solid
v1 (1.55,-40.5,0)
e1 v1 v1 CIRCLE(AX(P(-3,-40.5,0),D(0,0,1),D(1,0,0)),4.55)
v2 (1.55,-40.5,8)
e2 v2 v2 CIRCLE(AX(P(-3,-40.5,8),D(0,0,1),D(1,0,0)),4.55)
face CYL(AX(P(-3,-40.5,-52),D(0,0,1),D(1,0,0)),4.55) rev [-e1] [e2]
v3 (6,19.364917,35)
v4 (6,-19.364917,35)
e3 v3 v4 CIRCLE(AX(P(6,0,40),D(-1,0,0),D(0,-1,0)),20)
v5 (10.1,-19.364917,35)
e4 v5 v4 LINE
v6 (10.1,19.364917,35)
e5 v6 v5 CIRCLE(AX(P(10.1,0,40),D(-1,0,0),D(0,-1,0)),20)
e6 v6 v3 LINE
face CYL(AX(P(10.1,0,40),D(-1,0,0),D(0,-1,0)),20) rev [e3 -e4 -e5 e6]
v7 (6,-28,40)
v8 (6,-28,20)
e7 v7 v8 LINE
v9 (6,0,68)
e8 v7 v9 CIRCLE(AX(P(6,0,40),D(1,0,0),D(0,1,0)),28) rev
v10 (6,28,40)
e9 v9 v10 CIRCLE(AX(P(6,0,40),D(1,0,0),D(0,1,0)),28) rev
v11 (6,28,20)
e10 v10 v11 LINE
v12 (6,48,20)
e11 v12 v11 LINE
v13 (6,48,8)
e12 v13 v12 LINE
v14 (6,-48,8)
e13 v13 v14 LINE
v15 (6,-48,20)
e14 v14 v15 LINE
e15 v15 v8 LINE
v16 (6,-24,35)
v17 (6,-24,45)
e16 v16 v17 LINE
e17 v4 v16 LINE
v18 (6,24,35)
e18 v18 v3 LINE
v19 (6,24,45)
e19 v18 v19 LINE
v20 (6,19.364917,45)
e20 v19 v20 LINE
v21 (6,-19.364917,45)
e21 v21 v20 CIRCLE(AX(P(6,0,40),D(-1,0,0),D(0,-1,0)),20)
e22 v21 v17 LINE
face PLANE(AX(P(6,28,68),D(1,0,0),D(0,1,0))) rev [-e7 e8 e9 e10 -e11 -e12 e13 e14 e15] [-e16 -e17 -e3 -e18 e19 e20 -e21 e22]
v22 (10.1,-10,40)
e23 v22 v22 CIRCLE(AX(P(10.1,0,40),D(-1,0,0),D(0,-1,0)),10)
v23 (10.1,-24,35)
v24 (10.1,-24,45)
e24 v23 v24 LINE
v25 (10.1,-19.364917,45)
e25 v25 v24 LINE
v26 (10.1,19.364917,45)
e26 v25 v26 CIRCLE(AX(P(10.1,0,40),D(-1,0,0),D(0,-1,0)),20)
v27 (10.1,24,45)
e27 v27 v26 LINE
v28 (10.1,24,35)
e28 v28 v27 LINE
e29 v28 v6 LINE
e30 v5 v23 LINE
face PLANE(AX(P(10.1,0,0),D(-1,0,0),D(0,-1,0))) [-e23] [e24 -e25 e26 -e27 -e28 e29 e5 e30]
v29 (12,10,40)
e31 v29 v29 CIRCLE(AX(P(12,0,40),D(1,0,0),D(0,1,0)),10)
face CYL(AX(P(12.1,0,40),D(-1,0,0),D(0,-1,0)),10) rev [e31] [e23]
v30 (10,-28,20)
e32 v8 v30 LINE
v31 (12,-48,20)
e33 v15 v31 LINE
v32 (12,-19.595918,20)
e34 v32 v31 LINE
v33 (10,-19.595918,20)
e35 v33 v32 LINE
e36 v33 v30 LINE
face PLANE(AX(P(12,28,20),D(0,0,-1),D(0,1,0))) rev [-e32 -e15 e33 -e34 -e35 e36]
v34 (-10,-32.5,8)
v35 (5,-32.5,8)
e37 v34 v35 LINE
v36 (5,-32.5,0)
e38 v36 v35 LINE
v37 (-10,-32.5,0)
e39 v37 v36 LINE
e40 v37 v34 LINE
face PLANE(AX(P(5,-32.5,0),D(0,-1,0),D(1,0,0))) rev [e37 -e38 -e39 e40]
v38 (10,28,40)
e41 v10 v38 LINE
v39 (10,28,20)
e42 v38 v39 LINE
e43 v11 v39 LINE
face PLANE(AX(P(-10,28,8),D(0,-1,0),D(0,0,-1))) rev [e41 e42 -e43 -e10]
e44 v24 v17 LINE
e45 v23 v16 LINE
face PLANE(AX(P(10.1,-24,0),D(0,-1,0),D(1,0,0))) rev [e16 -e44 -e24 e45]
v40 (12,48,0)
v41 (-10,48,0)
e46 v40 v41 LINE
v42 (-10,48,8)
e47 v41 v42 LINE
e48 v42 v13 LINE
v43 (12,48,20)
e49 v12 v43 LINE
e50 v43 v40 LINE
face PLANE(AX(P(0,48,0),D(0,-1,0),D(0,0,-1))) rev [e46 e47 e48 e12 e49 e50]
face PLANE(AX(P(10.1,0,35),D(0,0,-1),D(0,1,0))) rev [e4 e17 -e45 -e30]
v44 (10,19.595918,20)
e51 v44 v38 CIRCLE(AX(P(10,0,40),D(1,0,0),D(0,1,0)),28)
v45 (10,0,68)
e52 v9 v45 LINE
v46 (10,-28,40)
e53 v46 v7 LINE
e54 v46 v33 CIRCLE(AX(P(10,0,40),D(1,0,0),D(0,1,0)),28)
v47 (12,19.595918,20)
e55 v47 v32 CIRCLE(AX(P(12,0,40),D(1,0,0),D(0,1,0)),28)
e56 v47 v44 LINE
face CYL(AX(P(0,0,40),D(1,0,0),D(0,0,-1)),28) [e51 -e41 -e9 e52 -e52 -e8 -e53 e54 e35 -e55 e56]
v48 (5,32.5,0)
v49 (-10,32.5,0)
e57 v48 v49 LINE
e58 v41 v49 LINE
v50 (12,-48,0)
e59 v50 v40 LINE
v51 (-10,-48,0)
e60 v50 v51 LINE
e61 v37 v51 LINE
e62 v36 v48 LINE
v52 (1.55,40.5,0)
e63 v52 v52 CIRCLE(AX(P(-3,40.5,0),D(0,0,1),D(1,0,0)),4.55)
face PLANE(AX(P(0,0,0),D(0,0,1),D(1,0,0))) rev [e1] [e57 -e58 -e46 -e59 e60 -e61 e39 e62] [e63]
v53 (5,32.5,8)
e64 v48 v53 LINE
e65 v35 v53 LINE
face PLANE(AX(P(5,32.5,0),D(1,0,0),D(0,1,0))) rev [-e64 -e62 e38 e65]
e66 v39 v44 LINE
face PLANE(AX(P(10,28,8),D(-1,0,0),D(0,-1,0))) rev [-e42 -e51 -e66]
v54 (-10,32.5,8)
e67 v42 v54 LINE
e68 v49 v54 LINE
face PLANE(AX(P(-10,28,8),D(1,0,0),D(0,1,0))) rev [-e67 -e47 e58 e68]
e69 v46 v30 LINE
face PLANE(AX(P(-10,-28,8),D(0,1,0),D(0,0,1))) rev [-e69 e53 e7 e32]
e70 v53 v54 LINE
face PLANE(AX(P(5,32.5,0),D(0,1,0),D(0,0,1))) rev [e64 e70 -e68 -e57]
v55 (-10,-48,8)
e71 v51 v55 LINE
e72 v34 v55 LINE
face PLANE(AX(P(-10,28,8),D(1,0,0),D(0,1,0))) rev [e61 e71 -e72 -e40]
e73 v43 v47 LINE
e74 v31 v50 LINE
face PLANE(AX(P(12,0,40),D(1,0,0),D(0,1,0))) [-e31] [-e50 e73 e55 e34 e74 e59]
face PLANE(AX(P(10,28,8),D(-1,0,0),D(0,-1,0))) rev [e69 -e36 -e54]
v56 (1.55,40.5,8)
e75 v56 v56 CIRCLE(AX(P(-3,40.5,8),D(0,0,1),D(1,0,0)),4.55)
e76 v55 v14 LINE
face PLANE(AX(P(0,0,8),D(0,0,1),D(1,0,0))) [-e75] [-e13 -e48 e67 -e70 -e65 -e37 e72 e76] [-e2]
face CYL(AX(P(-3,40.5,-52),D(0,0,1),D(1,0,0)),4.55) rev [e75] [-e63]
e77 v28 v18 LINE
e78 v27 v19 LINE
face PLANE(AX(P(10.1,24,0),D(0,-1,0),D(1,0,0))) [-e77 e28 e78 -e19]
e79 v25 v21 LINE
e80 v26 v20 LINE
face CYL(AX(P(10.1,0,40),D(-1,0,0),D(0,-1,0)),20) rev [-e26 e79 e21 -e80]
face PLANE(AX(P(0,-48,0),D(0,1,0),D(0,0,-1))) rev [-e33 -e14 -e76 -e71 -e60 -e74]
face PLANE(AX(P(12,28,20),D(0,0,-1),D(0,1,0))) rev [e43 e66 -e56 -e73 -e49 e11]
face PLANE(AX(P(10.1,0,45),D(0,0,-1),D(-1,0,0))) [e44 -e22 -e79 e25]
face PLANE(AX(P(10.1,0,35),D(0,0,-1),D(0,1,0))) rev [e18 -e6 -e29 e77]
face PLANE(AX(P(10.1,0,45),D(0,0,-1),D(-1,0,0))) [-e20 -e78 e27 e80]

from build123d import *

# Parameters (mm, degrees)
SKETCH_1_W          = 20
SKETCH_1_H          = 56
EXTRUDE_1_DEPTH     = 8
SKETCH_2_W          = 4
SKETCH_2_H          = 56
EXTRUDE_2_DEPTH     = 60
FILLET_1_R          = 28
SKETCH_5_R          = 28
EXTRUDE_3_DEPTH     = 2
CUT_EXTRUDE_2_DEPTH = 4.1
SKETCH_6_W          = 20
SKETCH_6_H          = 56
EXTRUDE_4_DEPTH     = 2
SKETCH_7_R          = 10
CUT_EXTRUDE_3_DEPTH = 2
EXTRUDE_5_DEPTH     = 20
SKETCH_3_R          = 4.55
CUT_EXTRUDE_1_DEPTH = 60
SKETCH_9_W          = 15
SKETCH_9_H          = 65
CUT_EXTRUDE_4_DEPTH = 78.768888381


with BuildPart() as part:
    # 스케치1 → 보스-돌출1 (new body)
    with BuildSketch(Plane.XY):
        Rectangle(SKETCH_1_W, SKETCH_1_H)
    extrude(amount=EXTRUDE_1_DEPTH)

    # 스케치2 → 보스-돌출2 (add)
    with BuildSketch(Plane.XY.offset(8)):
        with Locations((8, 0)):
            Rectangle(SKETCH_2_W, SKETCH_2_H)
    extrude(amount=EXTRUDE_2_DEPTH)

    # 필렛1
    fillet_1_edges = [part.edges().sort_by_distance(p)[0] for p in [
        (8, 28, 68),
        (8, -28, 68),
    ]]
    fillet(fillet_1_edges, radius=FILLET_1_R - 0.0001)  # a hair under: the kernel refuses the full size

    # 스케치5 → 보스-돌출3 (add)
    with BuildSketch(Plane(origin=(10, 0, 0), x_dir=(0, 0, -1), z_dir=(1, 0, 0))):
        with Locations(Location((-40, 0, 0), (0, 0, 90))):
            Circle(SKETCH_5_R)
    extrude(amount=EXTRUDE_3_DEPTH)

    # 스케치4 → 컷-돌출2 (cut)
    with BuildSketch(Plane.ZY.offset(-6)):
        with BuildLine():
            Line((35, 16), (35, 19.364916731))
            ThreePointArc((35, 19.364916731), (20, 0), (35, -19.364916731))
            Line((35, -19.364916731), (35, -16))
            Line((35, -16), (45, -16))
            Line((45, -16), (45, -19.364916731))
            ThreePointArc((45, -19.364916731), (55.811388301, -12.247448714), (60, 0))
            ThreePointArc((60, 0), (55.811388301, 12.247448714), (45, 19.364916731))
            Line((45, 19.364916731), (45, 16))
            Line((45, 16), (35, 16))
        make_face()
        with BuildLine():
            ThreePointArc((45, -19.364916731), (40, -20), (35, -19.364916731))
            Line((35, -19.364916731), (35, -24))
            Line((35, -24), (45, -24))
            Line((45, -24), (45, -19.364916731))
        make_face()
        with BuildLine():
            Line((35, -16), (35, -19.364916731))
            ThreePointArc((35, -19.364916731), (40, -20), (45, -19.364916731))
            Line((45, -19.364916731), (45, -16))
            Line((45, -16), (35, -16))
        make_face()
        with BuildLine():
            Line((45, 24), (35, 24))
            Line((35, 24), (35, 19.364916731))
            ThreePointArc((35, 19.364916731), (40, 20), (45, 19.364916731))
            Line((45, 19.364916731), (45, 24))
        make_face()
        with BuildLine():
            ThreePointArc((45, 19.364916731), (40, 20), (35, 19.364916731))
            Line((35, 19.364916731), (35, 16))
            Line((35, 16), (45, 16))
            Line((45, 16), (45, 19.364916731))
        make_face()
    extrude(amount=-CUT_EXTRUDE_2_DEPTH, mode=Mode.SUBTRACT)

    # 스케치6 → 보스-돌출4 (add)
    with BuildSketch(Plane(origin=(10, 0, 0), x_dir=(0, 0, -1), z_dir=(1, 0, 0))):
        with Locations((-10, 0)):
            Rectangle(SKETCH_6_W, SKETCH_6_H)
    extrude(amount=EXTRUDE_4_DEPTH)

    # 스케치7 → 컷-돌출3 (cut)
    with BuildSketch(Plane.ZY.offset(-10.1)):
        with Locations(Location((40, 0, 0), (0, 0, 270))):
            Circle(SKETCH_7_R)
    extrude(amount=-CUT_EXTRUDE_3_DEPTH, mode=Mode.SUBTRACT)

    # 스케치8 → 보스-돌출5 (add)
    with BuildSketch(Plane(origin=(0, 28, 0), x_dir=(1, 0, 0), z_dir=(0, 1, 0))):
        Polygon((-10, -8), (-10, 0), (12, 0), (12, -20), (6, -20), (6, -8), align=None)
    extrude_5 = extrude(amount=EXTRUDE_5_DEPTH)

    # 대칭 복사1: 보스-돌출5 across plane
    add(extrude_5.mirror(Plane.ZX))

    # 스케치3 → 컷-돌출1 (cut)
    with BuildSketch(Plane.XY.offset(8)):
        with Locations((-3, -40.5)):
            Circle(SKETCH_3_R)
        with Locations((-3, 40.5)):
            Circle(SKETCH_3_R)
    extrude(amount=-CUT_EXTRUDE_1_DEPTH, mode=Mode.SUBTRACT)

    # 스케치9 → 컷-돌출4 (cut, through all)
    with BuildSketch(Plane.XY.offset(8)):
        with Locations((-2.5, 0)):
            Rectangle(SKETCH_9_W, SKETCH_9_H)
    extrude(amount=-CUT_EXTRUDE_4_DEPTH, mode=Mode.SUBTRACT)


solid = part.part
